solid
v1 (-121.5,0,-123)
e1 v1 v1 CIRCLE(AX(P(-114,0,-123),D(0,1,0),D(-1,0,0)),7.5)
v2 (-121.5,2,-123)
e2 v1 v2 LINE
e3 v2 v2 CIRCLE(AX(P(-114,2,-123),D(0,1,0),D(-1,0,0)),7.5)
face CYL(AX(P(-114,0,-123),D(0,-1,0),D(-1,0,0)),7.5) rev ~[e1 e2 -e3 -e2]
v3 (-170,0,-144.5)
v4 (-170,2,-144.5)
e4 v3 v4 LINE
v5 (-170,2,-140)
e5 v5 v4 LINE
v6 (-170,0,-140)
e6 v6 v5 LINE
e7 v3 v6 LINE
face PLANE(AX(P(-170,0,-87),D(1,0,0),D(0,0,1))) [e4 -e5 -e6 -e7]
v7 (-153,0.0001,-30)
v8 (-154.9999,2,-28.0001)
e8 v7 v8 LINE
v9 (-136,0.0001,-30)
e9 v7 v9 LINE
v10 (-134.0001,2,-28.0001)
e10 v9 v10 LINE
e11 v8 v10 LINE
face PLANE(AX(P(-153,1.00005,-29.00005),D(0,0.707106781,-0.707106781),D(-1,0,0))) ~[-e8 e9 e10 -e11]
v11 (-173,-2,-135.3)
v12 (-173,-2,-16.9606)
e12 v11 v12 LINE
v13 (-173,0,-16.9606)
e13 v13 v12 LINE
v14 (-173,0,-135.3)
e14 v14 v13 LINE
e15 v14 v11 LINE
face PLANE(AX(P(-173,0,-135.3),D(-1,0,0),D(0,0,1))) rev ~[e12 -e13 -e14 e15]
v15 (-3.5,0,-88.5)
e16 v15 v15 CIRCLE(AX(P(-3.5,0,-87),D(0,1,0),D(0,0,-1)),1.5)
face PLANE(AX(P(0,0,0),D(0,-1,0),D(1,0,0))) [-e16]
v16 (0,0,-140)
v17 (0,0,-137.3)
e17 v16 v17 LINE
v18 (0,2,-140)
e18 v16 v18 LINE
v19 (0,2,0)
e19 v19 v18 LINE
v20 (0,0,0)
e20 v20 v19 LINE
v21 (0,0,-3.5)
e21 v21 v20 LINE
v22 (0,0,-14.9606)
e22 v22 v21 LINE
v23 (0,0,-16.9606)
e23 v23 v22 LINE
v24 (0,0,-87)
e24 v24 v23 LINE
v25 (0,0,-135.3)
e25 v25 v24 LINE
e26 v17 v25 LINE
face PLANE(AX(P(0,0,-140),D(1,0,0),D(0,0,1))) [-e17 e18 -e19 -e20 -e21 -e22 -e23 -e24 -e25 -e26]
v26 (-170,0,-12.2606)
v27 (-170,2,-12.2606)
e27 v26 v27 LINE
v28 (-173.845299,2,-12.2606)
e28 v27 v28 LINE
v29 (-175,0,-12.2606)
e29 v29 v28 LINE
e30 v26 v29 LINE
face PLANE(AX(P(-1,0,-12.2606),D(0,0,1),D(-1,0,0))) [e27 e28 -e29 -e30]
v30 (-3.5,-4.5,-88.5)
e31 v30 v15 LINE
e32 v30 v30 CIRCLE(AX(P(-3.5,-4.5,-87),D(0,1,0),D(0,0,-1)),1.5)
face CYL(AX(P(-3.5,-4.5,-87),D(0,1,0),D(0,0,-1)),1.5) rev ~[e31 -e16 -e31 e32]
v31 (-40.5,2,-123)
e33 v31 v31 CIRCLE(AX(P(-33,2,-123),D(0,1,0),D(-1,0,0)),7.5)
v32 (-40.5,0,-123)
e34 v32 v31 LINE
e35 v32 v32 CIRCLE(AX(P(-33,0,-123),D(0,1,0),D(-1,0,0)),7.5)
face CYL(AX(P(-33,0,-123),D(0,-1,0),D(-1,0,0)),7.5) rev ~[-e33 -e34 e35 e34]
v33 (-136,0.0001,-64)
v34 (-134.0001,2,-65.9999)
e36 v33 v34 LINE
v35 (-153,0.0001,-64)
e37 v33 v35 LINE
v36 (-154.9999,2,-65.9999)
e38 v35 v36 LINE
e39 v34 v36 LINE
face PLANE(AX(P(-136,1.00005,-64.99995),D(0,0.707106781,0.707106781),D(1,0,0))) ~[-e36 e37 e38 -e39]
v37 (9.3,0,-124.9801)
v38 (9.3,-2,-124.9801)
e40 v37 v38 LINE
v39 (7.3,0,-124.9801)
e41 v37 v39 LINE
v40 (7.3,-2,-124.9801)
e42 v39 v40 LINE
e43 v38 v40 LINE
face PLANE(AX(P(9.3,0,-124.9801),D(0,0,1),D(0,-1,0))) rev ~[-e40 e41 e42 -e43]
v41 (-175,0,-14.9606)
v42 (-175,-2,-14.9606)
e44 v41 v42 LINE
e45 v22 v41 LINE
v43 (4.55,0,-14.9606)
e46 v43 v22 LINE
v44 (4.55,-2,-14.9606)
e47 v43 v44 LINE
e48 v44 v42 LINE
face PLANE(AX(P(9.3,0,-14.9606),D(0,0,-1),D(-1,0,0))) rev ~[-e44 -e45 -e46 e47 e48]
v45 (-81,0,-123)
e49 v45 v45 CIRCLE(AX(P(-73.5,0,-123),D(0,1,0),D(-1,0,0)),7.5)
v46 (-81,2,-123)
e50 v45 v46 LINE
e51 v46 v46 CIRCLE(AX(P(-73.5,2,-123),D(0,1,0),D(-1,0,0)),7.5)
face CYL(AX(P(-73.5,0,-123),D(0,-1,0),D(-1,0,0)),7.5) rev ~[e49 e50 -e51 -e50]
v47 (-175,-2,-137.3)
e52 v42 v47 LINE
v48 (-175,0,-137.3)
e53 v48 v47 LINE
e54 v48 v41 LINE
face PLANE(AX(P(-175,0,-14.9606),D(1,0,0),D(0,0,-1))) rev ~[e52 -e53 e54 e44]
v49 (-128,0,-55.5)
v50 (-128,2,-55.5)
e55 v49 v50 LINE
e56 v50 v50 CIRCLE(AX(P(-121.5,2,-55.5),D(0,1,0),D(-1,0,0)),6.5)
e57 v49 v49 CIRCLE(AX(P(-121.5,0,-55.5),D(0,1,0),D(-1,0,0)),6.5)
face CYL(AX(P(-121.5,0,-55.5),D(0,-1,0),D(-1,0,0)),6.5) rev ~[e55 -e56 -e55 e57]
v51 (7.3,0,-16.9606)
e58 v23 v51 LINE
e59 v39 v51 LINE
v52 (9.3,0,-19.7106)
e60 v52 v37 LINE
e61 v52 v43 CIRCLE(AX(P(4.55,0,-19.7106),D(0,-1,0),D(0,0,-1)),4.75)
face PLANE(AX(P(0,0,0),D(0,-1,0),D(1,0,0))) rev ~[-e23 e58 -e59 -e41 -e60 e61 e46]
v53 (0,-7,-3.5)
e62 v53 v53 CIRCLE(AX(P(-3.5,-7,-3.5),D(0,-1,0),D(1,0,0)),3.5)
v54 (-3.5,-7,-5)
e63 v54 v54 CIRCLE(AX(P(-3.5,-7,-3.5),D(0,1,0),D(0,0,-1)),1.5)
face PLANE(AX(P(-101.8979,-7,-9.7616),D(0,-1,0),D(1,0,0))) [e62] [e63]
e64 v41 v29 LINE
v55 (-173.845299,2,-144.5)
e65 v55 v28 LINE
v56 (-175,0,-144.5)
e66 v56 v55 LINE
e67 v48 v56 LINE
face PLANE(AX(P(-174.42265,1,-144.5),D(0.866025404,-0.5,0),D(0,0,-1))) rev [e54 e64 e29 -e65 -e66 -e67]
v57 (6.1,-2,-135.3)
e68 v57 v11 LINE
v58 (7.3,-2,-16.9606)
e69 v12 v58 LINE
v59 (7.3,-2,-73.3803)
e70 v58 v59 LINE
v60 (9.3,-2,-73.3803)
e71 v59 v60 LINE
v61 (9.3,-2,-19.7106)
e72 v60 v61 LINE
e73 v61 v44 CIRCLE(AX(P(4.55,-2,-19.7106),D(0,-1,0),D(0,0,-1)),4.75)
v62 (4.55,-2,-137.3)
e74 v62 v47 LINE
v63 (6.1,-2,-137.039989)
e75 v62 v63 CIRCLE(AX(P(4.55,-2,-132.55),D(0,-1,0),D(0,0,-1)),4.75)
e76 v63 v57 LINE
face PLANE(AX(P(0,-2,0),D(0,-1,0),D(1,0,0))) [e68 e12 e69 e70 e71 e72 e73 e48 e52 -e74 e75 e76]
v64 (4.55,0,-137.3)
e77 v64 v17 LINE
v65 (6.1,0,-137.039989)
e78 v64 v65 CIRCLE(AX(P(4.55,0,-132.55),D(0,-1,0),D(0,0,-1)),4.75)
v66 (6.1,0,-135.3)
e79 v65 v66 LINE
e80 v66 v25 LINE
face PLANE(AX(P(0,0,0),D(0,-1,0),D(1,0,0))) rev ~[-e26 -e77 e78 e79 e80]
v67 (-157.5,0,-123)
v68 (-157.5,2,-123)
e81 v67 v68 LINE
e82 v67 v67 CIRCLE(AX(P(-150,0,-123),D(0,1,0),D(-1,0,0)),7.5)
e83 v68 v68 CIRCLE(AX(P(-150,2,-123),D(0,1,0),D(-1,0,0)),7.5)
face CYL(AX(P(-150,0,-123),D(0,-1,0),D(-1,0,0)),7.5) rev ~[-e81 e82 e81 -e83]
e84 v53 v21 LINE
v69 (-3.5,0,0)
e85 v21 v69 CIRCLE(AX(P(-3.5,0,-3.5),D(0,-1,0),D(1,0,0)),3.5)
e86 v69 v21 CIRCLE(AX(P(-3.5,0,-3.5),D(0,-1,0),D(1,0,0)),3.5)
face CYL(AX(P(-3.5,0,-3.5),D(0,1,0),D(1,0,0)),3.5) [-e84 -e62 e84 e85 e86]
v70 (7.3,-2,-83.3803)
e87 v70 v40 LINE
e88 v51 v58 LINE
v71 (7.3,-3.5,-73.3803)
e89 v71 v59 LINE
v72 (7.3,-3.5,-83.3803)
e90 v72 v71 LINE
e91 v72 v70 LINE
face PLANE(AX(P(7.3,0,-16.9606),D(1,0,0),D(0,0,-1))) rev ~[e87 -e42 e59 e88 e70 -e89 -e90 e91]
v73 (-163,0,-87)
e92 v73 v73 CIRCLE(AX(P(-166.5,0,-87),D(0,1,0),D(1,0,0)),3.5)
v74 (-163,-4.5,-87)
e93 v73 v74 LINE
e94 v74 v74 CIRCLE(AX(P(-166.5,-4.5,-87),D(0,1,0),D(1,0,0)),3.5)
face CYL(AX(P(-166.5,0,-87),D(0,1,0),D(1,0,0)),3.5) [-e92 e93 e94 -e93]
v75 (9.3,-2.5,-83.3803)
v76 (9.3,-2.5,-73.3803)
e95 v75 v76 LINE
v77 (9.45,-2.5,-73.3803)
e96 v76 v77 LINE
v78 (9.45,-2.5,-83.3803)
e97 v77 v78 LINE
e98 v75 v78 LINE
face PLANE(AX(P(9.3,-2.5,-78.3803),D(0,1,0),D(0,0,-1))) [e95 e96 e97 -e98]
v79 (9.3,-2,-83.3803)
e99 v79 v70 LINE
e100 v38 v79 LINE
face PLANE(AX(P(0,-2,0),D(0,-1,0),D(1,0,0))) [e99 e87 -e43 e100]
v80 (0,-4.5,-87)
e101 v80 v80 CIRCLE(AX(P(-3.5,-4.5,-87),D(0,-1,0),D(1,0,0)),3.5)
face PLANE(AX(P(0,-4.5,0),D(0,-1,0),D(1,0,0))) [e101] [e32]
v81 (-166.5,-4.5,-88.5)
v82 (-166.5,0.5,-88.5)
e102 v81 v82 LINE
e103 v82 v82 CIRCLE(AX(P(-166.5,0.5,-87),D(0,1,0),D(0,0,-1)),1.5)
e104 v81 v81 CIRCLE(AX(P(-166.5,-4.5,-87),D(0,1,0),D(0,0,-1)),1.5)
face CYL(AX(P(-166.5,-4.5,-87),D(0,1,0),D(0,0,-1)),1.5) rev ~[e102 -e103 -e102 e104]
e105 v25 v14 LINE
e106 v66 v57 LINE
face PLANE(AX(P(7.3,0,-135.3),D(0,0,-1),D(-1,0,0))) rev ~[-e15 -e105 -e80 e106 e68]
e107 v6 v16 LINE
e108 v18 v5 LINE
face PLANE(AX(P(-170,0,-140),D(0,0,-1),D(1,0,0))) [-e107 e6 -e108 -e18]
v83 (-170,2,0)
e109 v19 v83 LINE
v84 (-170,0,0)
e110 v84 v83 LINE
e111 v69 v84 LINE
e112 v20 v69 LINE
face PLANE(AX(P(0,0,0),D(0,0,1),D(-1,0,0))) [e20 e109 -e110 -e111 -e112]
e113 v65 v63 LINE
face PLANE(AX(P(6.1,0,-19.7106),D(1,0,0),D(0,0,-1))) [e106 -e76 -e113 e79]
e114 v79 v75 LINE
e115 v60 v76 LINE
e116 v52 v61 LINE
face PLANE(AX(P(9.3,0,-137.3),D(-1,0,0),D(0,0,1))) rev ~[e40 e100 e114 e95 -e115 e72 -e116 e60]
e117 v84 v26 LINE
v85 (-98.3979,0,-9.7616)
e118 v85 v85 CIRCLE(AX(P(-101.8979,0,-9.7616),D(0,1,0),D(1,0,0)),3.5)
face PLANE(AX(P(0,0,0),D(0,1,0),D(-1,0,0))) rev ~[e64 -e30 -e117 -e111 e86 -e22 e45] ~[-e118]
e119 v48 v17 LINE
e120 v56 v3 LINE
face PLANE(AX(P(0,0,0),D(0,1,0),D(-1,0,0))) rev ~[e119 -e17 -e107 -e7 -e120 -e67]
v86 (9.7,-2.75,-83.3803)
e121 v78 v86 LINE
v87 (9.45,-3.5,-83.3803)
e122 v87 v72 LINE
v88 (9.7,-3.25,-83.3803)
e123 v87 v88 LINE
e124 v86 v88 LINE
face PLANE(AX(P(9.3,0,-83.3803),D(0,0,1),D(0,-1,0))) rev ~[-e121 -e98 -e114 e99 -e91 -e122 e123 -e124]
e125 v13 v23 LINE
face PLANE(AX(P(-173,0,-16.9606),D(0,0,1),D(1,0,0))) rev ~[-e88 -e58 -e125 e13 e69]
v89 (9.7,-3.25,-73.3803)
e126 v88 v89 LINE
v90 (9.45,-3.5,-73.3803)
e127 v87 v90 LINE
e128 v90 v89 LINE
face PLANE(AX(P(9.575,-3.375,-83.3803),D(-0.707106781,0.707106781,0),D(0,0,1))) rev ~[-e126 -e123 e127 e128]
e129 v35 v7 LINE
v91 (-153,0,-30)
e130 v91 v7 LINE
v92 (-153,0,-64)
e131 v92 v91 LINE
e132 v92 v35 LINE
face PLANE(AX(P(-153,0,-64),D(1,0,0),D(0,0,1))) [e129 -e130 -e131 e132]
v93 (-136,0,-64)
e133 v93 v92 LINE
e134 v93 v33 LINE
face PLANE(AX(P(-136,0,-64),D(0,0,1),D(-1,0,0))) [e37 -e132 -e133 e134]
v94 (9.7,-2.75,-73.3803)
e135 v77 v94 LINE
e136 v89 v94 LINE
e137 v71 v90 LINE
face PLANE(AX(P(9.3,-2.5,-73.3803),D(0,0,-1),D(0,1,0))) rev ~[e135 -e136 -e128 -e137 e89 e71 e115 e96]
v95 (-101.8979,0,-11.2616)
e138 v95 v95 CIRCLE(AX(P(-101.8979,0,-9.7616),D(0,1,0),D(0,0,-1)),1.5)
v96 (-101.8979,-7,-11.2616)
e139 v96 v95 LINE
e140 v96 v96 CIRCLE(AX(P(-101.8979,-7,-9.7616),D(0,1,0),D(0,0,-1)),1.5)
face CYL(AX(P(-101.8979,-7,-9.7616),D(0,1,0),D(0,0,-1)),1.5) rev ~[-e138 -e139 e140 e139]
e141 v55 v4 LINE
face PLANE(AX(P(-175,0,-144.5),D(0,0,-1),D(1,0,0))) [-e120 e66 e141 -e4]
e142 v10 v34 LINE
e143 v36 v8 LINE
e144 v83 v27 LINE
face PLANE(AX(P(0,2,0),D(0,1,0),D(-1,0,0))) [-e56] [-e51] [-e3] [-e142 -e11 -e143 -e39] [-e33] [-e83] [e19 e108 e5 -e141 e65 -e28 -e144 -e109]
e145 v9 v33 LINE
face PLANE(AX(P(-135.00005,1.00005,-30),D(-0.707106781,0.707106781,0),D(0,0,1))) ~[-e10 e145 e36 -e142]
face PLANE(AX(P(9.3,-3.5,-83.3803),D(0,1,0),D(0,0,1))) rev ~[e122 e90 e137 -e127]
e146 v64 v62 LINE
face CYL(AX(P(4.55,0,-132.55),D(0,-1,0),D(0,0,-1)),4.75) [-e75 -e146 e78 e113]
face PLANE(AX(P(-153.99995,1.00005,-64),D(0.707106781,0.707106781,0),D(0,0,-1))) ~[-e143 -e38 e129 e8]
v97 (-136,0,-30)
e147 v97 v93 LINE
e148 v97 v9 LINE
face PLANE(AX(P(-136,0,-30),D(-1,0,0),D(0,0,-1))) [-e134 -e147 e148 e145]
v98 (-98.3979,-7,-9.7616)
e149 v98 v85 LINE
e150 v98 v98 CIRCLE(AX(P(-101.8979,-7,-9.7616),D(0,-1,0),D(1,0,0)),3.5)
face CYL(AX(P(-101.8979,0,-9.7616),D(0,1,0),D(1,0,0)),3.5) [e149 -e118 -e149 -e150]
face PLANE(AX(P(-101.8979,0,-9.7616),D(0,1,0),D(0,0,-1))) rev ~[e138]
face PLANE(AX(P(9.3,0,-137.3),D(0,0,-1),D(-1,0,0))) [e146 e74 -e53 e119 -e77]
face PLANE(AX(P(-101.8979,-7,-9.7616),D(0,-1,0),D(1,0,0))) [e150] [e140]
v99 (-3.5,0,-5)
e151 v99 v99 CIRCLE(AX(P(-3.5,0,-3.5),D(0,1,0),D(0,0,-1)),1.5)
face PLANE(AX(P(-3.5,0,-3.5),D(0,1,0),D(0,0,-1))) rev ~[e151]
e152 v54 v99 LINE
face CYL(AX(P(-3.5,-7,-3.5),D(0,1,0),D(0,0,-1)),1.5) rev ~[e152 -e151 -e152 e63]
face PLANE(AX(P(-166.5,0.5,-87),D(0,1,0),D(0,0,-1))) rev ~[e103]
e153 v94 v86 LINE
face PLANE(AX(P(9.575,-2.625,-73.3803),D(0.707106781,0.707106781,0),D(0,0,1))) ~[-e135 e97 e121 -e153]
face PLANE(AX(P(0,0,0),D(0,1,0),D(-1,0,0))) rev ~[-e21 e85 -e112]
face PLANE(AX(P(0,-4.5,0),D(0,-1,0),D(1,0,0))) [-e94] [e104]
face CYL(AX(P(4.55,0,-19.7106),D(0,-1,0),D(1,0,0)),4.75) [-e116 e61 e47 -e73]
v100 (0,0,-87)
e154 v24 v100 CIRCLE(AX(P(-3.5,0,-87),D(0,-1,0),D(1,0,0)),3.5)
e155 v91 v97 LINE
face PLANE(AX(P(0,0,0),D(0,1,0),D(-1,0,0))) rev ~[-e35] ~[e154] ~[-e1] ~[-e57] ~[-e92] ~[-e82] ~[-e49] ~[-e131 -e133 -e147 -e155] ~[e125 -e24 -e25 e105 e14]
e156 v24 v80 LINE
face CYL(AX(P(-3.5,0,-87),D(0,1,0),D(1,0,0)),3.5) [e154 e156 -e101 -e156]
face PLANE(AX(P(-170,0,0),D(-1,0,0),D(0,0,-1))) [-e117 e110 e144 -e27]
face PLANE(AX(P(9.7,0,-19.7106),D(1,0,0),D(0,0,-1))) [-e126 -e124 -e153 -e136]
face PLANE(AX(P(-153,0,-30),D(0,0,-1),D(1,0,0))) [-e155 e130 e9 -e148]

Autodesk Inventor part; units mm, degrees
ref_plane "YZ Plane" through (0, 0, 0) normal (1, 0, 0) x (0, 1, 0)
ref_plane "XZ Plane" through (0, 0, 0) normal (0, 1, 0) x (-1, 0, 0)
ref_plane "XY Plane" through (0, 0, 0) normal (0, 0, 1) x (1, 0, 0)
sketch "Skizze1" plane through (0, 0, 0) normal (0, 1, 0) x (-1, 0, 0)
  line L0 (0, 0) -> (170, 0)
  line L1 (170, 0) -> (170, -140)
  line L2 (170, -140) -> (0, -140)
  line L3 (0, -140) -> (0, 0)
  circle A0 centre (150, -123) radius 7.5
  circle A1 centre (114, -123) radius 7.5
  circle A2 centre (73.5, -123) radius 7.5
  circle A3 centre (33, -123) radius 7.5
  line L4 (153, -30) -> (136, -30)
  line L5 (136, -30) -> (136, -64)
  line L6 (136, -64) -> (153, -64)
  line L7 (153, -64) -> (153, -30)
  circle A4 centre (121.5, -55.5) radius 6.5
  line L8 (150, -123) -> (0, -123) construction
  dimension "d0" = 170
  dimension "d1" = 140
  dimension "d2" = 15
  dimension "d3" = 123
  dimension "d4" = 20
  dimension "d8" = 56
  dimension "d9" = 96.5
  dimension "d10" = 137
  dimension "d11" = 17
  dimension "d12" = 34
  dimension "d13" = 30
  dimension "d14" = 17
  dimension "d15" = 13
  dimension "d17" = 48.5
  dimension "d100" = 25.5
extrude "Extrusion1" add sketch "Skizze1" along normal blind 2
chamfer "Fase1" distance 2 angle 45 4 edges at (-153, 2, -47) (-144.5, 2, -64) (-136, 2, -47) (-144.5, 2, -30)
sketch "Skizze2" plane through (0, 0, 0) normal (0, -1, 0) x (1, 0, 0)
  circle A0 centre (-101.8979, -9.7616) radius 3.5
  circle A1 centre (-3.5, -87) radius 3.5
  circle A2 centre (-3.5, -3.5) radius 3.5
  line L0 (0, 0) -> (0, -140) projected
  line L1 (0, -140) -> (-170, -140) projected
  line L2 (-170, 0) -> (0, 0) projected
  circle A3 centre (-166.5, -87) radius 3.5
  line L3 (-170, -140) -> (-170, 0) projected
  dimension "d23" = 7
  dimension "d24" = 7
  dimension "d25" = 7
  dimension "d26" = 3.5
  dimension "d28" = 3.5
  dimension "d29" = 3.5
  dimension "d30" = 7
  dimension "d31" = 3.5
  dimension "d32" = 87
  dimension "d33" = 87
extrude "Extrusion2" add sketch "Skizze2" along normal blind 4.5 contours A0 | A1 | A3 | A2
sketch "Skizze3" plane through (-101.8979, -4.5, -9.7616) normal (0, -1, 0) x (1, 0, 0)
  circle A0 centre (0, 0) radius 3.5 projected
  circle A1 centre (98.3979, 6.2616) radius 3.5 projected
  point P0 (101.8979, 9.7616)
extrude "Extrusion3" add sketch "Skizze3" along normal blind 2.5
sketch "Skizze4" plane through (-166.5, -4.5, -87) normal (0, -1, 0) x (1, 0, 0)
  circle A0 centre (163, 0) radius 3.5 projected
  point P0 (166.5, 87)
hole "Bohrung1" at (-3.5, -4.5, -87) direction (0, 1, 0) diameter 3 depth 5
sketch "Skizze5" plane through (-3.5, -7, -3.5) normal (0, -1, 0) x (1, 0, 0)
  circle A0 centre (0, 0) radius 3.5 projected
  point P0 (3.5, 3.5)
hole "Bohrung2" at (-3.5, -7, -3.5) direction (0, 1, 0) diameter 3 depth 7
sketch "Skizze6" plane through (-101.8979, -7, -9.7616) normal (0, -1, 0) x (1, 0, 0)
  circle A0 centre (0, 0) radius 3.5 projected
  point P0 (101.8979, 9.7616)
hole "Bohrung3" at (-101.8979, -7, -9.7616) direction (0, 1, 0) diameter 3 depth 7
sketch "Skizze7" plane through (-166.5, -4.5, -87) normal (0, -1, 0) x (1, 0, 0)
  circle A0 centre (0, 0) radius 3.5 projected
  point P0 (166.5, 87)
hole "Bohrung4" at (-166.5, -4.5, -87) direction (0, 1, 0) diameter 3 depth 5
sketch "Skizze8" plane through (0, 0, 0) normal (0, -1, 0) x (1, 0, 0)
  line L0 (0, -140) -> (-170, -140) projected
  line L1 (0, -140) -> (-8, -140)
  line L2 (-8, -140) -> (-8, -20)
  line L3 (-8, -20) -> (0, -20)
  line L4 (0, -20) -> (0, -140)
  circle A0 centre (-33, -123) radius 7.5 projected
  circle A1 centre (-150, -123) radius 7.5 projected
  line L5 (-170, -24.5) -> (-175, -24.5)
  line L6 (-175, -24.5) -> (-175, -144.5)
  line L7 (-175, -144.5) -> (-170, -144.5)
  line L8 (-170, -144.5) -> (-170, -24.5)
  line L9 (-170, -140) -> (-170, -87) projected
  line L10 (-175, -24.5) -> (-1, -24.5)
  line L11 (-1, -24.5) -> (-1, -12.2606)
  line L12 (-1, -12.2606) -> (-175, -12.2606)
  line L13 (-175, -12.2606) -> (-175, -24.5)
  point P0 (0, 0)
  point P1 (0, 0)
  point P2 (-1, -20)
  dimension "d66" = 25
  dimension "d67" = 25
extrude "Extrusion4" add sketch "Skizze8" against normal blind 2 contours L0 L2 L10 L11 L3 L4 | L8 L7 L6 L5 | L10 L5 L13 L12 L11 L3 L2 | L2 L3 L11 L10
sketch "Skizze9" plane through (0, 0, 0) normal (0, -1, 0) x (1, 0, 0)
  arc A0 (0, -3.5) -> (-3.5, 0) centre (-3.5, -3.5) ccw projected
  circle A1 centre (-3.5, -87) radius 3.5 projected
  circle A2 centre (-101.8979, -9.7616) radius 3.5 projected
  circle A3 centre (-150, -123) radius 7.5 projected
  circle A4 centre (-114, -123) radius 7.5 projected
  circle A5 centre (-73.5, -123) radius 7.5 projected
  circle A6 centre (-33, -123) radius 7.5 projected
  circle A7 centre (-121.5, -55.5) radius 6.5 projected
  line L0 (-153, -30) -> (-153, -64) projected
  line L1 (-136, -30) -> (-153, -30) projected
  line L2 (-136, -64) -> (-136, -30) projected
  line L3 (-153, -64) -> (-136, -64) projected
  circle A8 centre (-166.5, -87) radius 3.5 projected
  line L4 (9.3, -137.3) -> (-175, -137.3)
  line L5 (9.3, -137.3) -> (9.3, -14.9606)
  line L6 (9.3, -14.9606) -> (-175, -14.9606)
  line L7 (-175, -14.9606) -> (-175, -137.3)
  line L8 (12, -120) -> (12, 12.2394) projected
  line L9 (-170, -12.2606) -> (-175, -12.2606) projected
  line L10 (-175, -12.2606) -> (-175, -144.5) projected
  line L11 (0, -140) -> (-175, -140) projected
  line L12 (-173, -16.9606) -> (7.3, -16.9606)
  line L13 (7.3, -16.9606) -> (7.3, -135.3)
  line L14 (7.3, -135.3) -> (-173, -135.3)
  line L15 (-173, -135.3) -> (-173, -16.9606)
  line L16 (-173, -135.3) -> (-173, -137.3)
  point P0 (0, 0)
  dimension "d81" = 127.7394
  dimension "d70" = 2.7
  dimension "d71" = 2.7
  dimension "d72" = 0
  dimension "d73" = 2.7
  dimension "d74" = 2
  dimension "d75" = 2
  dimension "d76" = 2
  dimension "d77" = 2
extrude "Extrusion5" add sketch "Skizze9" along normal blind 2 contours L4 L7 L6 L5
fillet "Rundung1" radius 4.75 2 edges at (9.3, -1, -137.3) (9.3, -1, -14.9606)
sketch "Skizze10" plane through (9.3, 0, -19.7106) normal (1, 0, 0) x (0, 0, -1)
  line L0 (117.5894, 0) -> (-4.75, 0) projected
  line L1 (53.6697, 0) -> (63.6697, 0)
  line L2 (63.6697, 0) -> (63.6697, -3.5)
  line L3 (63.6697, -3.5) -> (53.6697, -3.5)
  line L4 (53.6697, -3.5) -> (53.6697, 0)
  line L5 (58.6697, -3.5) -> (58.6697, 0)
  line L6 (-2.7, 2) -> (120.0394, 2) projected
  line L7 (0, 0) -> (117.3394, 0) projected
  line L8 (53.6697, -2.5) -> (63.6697, -2.5)
  point P0 (-19.7106, 0)
  dimension "d83" = 1
  dimension "d91" = 10
  dimension "d92" = 2.5
extrude "Extrusion6" add sketch "Skizze10" against normal blind 2
extrude "Extrusion7" add sketch "Skizze10" along normal blind 0.4 contours L2 L3 L5 L8 | L5 L3 L4 L8
chamfer "Fase2" distance 0.25 angle 45 2 edges at (9.7, -2.5, -78.3803) (9.7, -3.5, -78.3803)
chamfer "Fase3" distance 2 angle 30 1 edges at (-175, 2, -78.3803) measured on face at (-175, 1.3333, -57.2404)
sketch "Skizze11" plane through (9.3, 0, -19.7106) normal (1, 0, 0) x (0, 0, -1)
  line L0 (112.8394, 0) -> (112.8394, -2) projected
  line L1 (117.3394, 0) -> (105.2695, 0)
  line L2 (105.2695, 0) -> (105.2695, -2)
  line L3 (105.2695, -2) -> (117.3394, -2)
  line L4 (117.3394, -2) -> (117.3394, 0)
  point P0 (-19.7106, 0)
extrude "Extrusion8" cut sketch "Skizze11" against normal blind 3.2
sketch "Skizze12" plane through (4.55, -2, -137.3) normal (0, 0, -1) x (-1, 0, 0)
  line L0 (177.55, 0) -> (-2.75, 0) projected
  line L1 (4.55, 2) -> (179.55, 2) projected
  line L2 (99.55, 0) -> (84.55, 0)
  line L3 (84.55, 0) -> (84.55, 2)
  line L4 (84.55, 2) -> (99.55, 2)
  line L5 (99.55, 2) -> (99.55, 0)
  line L6 (179.55, 2) -> (179.55, 0) projected
  point P0 (0, 2)
  dimension "d98" = 15
  dimension "d99" = 80
properties part number "Fascia"
